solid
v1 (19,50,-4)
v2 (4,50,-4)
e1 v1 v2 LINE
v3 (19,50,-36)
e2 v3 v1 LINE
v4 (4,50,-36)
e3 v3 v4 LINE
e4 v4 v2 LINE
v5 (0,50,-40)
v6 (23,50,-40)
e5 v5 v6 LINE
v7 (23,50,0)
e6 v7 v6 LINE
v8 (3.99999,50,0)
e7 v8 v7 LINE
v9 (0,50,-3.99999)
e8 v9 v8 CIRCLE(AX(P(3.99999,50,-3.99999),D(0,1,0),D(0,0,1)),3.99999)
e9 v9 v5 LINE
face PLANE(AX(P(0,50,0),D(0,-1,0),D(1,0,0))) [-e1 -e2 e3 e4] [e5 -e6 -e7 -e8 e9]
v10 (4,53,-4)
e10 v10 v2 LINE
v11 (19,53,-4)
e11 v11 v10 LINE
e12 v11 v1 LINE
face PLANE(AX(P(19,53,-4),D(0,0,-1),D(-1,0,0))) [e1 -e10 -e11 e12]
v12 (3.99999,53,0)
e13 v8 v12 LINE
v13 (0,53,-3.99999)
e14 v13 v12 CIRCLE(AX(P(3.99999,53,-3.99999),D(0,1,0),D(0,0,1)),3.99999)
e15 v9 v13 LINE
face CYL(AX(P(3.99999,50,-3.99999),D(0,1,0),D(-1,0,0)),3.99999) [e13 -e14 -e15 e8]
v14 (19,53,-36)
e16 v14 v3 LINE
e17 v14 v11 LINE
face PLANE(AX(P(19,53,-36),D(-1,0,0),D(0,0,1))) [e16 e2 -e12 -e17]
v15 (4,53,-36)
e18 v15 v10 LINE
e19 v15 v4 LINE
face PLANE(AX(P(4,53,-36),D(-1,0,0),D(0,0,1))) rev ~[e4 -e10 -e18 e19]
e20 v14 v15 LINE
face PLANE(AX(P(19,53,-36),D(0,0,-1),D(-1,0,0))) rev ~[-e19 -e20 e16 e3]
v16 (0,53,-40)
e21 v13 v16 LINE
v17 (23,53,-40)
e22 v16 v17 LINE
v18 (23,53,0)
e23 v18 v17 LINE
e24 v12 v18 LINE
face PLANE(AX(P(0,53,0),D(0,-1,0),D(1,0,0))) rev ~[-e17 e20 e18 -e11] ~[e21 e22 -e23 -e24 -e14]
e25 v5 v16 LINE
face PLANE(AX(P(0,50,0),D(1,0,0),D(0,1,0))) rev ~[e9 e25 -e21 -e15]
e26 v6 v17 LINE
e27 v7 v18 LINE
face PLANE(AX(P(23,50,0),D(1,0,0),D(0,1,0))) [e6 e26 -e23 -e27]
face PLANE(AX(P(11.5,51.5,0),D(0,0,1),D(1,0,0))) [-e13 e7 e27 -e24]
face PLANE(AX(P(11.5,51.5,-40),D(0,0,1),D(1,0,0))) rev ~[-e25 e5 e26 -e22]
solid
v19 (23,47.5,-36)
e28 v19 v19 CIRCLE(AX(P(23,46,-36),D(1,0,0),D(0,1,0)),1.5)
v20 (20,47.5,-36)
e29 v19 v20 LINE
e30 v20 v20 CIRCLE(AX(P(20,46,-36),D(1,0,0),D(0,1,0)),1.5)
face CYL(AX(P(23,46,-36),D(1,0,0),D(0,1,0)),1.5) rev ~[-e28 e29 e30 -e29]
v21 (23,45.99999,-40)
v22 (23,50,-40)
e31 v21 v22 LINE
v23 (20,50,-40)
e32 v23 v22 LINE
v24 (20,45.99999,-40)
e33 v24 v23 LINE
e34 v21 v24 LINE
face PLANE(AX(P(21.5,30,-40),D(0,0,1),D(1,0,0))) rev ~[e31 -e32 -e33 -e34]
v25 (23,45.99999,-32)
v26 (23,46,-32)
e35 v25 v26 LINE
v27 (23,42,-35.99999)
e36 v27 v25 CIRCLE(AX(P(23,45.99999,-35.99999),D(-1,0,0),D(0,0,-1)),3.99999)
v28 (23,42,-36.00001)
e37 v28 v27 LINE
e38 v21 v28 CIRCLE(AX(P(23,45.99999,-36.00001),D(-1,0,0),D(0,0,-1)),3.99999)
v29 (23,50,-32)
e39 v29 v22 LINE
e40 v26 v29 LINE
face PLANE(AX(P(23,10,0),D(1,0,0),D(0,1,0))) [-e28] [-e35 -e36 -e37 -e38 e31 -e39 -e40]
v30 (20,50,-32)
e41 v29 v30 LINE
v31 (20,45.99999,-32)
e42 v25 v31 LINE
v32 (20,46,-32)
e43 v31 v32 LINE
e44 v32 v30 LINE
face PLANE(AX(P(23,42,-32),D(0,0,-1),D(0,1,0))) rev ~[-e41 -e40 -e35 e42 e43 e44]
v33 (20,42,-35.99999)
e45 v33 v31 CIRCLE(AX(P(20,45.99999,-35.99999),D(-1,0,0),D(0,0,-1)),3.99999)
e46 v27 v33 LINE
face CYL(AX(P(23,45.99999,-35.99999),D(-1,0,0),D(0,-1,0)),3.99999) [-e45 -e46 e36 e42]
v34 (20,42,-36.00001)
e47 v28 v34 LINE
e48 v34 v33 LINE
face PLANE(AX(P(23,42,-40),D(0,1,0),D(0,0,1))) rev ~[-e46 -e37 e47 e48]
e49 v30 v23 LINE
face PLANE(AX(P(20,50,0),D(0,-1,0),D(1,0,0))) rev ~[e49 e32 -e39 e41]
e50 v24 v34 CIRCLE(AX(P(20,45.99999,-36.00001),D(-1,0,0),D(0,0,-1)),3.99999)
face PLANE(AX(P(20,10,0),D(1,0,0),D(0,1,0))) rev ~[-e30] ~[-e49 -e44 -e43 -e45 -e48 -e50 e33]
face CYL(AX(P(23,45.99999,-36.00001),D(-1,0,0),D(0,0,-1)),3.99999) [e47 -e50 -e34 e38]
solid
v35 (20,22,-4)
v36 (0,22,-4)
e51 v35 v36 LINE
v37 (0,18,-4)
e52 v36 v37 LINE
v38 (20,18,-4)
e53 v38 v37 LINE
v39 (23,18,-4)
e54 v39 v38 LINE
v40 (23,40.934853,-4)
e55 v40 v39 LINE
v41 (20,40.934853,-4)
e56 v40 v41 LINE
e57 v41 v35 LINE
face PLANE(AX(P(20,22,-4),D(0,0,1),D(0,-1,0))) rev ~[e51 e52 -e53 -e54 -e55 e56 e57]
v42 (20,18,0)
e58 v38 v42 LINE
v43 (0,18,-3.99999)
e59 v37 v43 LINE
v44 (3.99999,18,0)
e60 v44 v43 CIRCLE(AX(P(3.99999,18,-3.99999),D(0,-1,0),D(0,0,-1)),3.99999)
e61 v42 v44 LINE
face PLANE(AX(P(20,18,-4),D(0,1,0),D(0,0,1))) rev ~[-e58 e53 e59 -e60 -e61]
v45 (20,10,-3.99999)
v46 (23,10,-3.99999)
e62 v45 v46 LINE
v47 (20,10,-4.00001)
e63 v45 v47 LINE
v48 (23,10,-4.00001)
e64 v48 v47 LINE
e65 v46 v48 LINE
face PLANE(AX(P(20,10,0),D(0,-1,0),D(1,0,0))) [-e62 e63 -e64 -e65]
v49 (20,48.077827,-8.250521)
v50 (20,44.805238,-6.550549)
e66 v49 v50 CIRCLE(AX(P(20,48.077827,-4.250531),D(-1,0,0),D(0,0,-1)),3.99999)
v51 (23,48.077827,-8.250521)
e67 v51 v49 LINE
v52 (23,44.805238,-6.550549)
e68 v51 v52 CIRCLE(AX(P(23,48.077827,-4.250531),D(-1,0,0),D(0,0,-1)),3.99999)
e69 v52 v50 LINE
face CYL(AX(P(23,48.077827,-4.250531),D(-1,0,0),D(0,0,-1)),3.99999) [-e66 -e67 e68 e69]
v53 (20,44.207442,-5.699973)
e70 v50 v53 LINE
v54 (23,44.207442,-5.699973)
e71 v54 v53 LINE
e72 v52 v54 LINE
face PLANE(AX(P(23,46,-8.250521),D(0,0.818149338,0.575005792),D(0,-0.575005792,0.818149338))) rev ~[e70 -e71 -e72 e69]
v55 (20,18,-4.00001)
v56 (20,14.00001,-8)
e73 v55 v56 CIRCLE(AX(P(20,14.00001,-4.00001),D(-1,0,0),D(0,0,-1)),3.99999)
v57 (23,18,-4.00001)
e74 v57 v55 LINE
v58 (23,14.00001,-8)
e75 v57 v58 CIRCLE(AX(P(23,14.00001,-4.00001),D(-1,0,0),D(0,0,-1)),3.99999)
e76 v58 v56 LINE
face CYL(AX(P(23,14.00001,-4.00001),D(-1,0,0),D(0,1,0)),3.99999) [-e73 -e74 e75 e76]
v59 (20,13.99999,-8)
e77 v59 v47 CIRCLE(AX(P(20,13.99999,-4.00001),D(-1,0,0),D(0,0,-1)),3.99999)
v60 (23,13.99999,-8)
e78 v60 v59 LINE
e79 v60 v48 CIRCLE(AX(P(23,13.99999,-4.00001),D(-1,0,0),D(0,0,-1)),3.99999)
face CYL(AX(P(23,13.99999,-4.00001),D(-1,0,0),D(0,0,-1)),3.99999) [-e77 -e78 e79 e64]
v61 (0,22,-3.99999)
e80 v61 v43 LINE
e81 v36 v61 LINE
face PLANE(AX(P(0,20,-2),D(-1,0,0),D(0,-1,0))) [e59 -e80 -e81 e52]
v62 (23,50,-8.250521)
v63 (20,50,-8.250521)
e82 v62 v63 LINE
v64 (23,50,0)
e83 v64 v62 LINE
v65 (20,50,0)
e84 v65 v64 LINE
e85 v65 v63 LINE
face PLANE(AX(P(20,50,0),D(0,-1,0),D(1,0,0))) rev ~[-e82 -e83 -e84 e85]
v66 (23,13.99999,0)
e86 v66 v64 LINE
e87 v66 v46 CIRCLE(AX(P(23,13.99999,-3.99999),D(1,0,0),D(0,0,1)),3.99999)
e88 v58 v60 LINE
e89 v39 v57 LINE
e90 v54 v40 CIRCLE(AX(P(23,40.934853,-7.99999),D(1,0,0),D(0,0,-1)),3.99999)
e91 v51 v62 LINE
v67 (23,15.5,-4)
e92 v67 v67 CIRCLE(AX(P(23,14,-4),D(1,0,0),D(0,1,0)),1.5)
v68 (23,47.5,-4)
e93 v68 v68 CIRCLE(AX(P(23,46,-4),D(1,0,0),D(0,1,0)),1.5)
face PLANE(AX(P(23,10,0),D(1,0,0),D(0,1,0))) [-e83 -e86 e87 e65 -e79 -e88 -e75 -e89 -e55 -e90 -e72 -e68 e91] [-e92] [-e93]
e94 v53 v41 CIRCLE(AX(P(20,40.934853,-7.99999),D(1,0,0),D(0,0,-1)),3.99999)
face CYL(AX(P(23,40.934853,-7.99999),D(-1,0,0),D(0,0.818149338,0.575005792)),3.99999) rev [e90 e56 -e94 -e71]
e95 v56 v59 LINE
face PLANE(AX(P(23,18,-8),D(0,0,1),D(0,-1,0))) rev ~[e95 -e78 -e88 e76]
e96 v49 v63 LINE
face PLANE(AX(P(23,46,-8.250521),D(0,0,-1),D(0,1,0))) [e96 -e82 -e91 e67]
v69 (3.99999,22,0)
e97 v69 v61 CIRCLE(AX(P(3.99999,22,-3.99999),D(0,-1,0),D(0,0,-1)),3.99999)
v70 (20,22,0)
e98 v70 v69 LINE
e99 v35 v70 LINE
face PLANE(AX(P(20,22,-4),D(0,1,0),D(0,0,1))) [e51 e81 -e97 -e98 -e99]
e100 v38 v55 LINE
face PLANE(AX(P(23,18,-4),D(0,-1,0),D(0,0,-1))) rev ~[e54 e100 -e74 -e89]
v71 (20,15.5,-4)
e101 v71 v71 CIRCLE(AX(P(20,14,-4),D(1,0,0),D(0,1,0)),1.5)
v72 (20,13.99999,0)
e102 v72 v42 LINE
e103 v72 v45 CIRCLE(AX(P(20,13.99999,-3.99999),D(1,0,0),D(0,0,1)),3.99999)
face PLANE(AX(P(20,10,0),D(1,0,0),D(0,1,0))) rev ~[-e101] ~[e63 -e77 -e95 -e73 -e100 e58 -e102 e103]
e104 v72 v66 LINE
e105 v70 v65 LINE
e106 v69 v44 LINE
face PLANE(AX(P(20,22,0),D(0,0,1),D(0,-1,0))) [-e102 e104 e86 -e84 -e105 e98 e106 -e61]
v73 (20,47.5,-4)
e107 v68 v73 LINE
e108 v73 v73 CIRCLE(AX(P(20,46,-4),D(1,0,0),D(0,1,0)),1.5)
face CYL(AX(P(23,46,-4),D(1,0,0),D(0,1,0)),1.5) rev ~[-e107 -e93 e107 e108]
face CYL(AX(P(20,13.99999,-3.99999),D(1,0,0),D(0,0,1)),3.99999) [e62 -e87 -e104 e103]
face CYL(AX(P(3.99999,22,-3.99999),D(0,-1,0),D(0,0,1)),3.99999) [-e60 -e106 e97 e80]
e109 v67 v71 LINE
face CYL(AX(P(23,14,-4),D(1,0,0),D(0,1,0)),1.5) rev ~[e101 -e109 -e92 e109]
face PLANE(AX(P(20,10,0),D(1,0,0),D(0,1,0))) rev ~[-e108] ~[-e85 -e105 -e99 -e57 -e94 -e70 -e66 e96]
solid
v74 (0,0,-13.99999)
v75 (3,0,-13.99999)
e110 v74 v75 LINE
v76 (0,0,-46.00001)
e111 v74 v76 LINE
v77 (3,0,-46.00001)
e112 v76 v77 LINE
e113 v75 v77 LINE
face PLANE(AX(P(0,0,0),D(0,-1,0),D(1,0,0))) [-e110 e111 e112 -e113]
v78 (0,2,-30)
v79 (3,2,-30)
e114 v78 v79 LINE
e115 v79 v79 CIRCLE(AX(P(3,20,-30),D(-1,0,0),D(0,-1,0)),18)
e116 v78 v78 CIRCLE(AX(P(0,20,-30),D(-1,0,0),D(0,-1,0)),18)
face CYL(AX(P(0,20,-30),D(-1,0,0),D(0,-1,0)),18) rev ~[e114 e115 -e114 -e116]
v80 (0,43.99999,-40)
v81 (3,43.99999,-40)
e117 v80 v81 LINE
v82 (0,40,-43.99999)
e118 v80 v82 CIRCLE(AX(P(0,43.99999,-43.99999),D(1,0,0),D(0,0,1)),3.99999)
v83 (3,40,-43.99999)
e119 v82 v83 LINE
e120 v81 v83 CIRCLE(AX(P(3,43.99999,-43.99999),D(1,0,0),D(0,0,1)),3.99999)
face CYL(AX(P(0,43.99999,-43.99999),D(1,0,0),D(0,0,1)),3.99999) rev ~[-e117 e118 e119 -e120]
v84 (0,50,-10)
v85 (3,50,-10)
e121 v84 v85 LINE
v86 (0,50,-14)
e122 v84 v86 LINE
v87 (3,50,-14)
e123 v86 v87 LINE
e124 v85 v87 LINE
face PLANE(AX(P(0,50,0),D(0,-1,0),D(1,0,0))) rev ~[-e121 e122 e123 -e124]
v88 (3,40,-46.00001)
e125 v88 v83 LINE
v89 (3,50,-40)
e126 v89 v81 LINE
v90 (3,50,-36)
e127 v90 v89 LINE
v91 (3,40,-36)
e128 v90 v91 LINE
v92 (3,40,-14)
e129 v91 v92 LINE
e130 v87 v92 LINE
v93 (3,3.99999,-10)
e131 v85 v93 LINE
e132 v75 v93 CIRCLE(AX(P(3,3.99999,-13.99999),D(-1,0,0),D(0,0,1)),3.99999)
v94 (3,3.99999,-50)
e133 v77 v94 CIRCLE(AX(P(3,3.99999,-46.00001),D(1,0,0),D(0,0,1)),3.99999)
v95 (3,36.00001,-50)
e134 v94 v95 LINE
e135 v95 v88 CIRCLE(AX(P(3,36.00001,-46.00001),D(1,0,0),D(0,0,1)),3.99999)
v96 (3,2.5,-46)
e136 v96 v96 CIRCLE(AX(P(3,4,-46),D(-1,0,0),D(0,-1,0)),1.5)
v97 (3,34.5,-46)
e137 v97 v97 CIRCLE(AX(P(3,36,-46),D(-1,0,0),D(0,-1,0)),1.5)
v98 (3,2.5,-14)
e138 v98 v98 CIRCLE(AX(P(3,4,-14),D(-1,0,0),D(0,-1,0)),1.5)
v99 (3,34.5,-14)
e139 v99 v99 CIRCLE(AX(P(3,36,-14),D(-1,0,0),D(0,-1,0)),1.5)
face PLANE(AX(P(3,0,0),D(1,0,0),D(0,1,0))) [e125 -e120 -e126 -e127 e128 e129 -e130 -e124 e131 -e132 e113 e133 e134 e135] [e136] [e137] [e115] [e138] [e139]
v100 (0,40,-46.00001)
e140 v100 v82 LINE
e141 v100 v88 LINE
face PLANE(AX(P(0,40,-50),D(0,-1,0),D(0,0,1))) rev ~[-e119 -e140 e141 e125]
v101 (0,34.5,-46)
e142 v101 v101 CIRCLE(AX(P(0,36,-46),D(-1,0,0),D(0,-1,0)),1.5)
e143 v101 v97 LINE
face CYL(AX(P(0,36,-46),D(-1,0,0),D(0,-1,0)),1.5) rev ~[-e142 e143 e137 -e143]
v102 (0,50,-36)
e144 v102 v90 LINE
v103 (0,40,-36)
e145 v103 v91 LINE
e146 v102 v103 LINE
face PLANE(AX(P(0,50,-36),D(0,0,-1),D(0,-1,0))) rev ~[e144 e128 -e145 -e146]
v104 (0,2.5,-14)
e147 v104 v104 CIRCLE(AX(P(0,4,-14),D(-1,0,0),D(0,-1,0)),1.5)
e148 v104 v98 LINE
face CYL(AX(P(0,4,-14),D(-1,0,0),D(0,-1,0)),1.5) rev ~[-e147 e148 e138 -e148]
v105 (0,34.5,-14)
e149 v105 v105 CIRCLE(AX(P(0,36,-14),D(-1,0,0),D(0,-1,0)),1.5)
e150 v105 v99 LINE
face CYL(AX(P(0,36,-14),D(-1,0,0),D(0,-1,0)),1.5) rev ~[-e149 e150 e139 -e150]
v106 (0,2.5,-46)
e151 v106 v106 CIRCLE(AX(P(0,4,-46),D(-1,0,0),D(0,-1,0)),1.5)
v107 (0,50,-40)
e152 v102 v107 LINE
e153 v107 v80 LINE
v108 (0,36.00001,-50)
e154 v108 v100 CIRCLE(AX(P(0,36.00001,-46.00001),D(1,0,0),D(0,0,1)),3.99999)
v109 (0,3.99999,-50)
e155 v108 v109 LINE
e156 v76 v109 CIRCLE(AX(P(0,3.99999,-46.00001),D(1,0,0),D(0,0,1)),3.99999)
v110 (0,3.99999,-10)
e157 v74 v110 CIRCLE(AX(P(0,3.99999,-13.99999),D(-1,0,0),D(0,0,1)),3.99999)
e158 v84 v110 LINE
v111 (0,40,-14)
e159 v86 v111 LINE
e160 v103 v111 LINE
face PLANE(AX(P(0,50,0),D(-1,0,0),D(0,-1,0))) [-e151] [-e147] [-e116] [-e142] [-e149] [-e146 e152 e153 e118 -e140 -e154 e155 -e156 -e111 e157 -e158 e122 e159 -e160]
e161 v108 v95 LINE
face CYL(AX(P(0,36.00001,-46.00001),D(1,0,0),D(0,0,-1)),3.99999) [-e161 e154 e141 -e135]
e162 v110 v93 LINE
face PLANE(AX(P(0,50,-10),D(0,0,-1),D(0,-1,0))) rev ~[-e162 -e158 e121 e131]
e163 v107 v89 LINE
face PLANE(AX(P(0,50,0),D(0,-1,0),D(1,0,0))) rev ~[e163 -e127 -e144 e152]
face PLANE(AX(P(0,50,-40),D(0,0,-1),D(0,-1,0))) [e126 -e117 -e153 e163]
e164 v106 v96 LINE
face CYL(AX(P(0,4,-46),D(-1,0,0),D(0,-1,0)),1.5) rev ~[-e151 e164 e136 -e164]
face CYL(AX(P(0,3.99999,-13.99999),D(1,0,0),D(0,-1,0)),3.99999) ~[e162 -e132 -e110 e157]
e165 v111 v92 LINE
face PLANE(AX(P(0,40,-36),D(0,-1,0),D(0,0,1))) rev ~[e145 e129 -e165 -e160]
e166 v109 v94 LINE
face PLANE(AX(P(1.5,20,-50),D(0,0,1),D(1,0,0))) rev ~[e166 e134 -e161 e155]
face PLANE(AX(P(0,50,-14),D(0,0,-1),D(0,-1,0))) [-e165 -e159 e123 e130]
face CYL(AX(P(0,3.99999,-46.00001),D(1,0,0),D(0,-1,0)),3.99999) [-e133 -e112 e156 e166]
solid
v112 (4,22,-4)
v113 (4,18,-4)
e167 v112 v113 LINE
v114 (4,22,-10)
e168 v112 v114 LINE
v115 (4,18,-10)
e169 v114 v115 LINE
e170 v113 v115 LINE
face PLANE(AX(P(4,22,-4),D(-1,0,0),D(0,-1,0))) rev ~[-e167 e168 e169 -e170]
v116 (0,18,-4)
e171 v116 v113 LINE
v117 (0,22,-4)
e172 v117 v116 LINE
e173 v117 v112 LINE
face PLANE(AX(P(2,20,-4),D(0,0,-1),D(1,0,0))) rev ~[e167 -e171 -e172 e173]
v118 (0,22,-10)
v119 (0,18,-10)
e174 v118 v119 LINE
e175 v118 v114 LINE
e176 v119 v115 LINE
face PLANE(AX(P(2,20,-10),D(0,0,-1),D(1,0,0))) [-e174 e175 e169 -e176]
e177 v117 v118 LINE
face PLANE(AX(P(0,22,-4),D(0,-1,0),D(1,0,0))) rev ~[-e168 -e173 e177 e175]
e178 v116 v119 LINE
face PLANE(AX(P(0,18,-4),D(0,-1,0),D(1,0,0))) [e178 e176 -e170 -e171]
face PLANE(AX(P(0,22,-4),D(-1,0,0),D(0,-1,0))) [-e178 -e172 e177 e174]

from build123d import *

# Parameters (mm, degrees)
F0_W      = 3
F0_H      = 40
F0_H_2    = 10
F3_DEPTH  = 50
F2_W      = 3
F2_H      = 40
F4_DEPTH  = 40
F1_W      = 23
F1_H      = 3
F5_DEPTH  = 40
F6_R      = 18
F7_DEPTH  = 3
F8_R      = 1.5
F9_DEPTH  = 3
F11_DEPTH = 3
F12_R     = 1.5
F13_DEPTH = 3
F14_W     = 15
F14_H     = 32
F15_DEPTH = 3
F16_W     = 10
F16_H     = 10
F17_DEPTH = 3
F18_W     = 10
F18_H     = 22
F18_W_2   = 50
F18_H_2   = 10
F19_DEPTH = 3
F20_W     = 4
F20_H     = 23.7494786941
F21_DEPTH = 3
F22_R     = 3.99999
F22_2_R   = 3.99999
F23_W     = 4
F23_H     = 4
F24_DEPTH = 20
F25_W     = 4
F25_H     = 4
F26_DEPTH = 6
F27_R     = 3.99999
F27_2_R   = 3.99999


# Not quite as in the source:
# - a fillet or chamfer is up to 0.001 mm smaller than in the source, because OpenCascade refuses the exact size


with BuildPart() as f3:
    # F0 (on Top) → F3 (new body)
    with BuildSketch(Plane.XY):
        with Locations((1.5, 20)):
            Rectangle(F0_W, F0_H)
        with Locations((1.5, 45)):
            Rectangle(F0_W, F0_H_2)
    extrude(amount=-F3_DEPTH)

    # F6 (on face) → F7 (cut)
    with BuildSketch(Plane(origin=(0, 0, 0), x_dir=(0, -1, 0), z_dir=(-1, 0, 0))):
        with Locations((-20, -30)):
            Circle(F6_R)
    extrude(amount=-F7_DEPTH, mode=Mode.SUBTRACT)

    # F8 (on face) → F9 (cut)
    with BuildSketch(Plane(origin=(0, 0, 0), x_dir=(0, -1, 0), z_dir=(-1, 0, 0))):
        with Locations((-4, -14)):
            Circle(F8_R)
        with Locations((-4, -46)):
            Circle(F8_R)
        with Locations((-36, -14)):
            Circle(F8_R)
        with Locations((-36, -46)):
            Circle(F8_R)
    extrude(amount=-F9_DEPTH, mode=Mode.SUBTRACT)

    # F16 (on face) → F17 (cut)
    with BuildSketch(Plane(origin=(0, 0, 0), x_dir=(0, -1, 0), z_dir=(-1, 0, 0))):
        with Locations((-45, -45)):
            Rectangle(F16_W, F16_H)
    extrude(amount=-F17_DEPTH, mode=Mode.SUBTRACT)

    # F18 (on face) → F19 (cut)
    with BuildSketch(Plane(origin=(0, 0, 0), x_dir=(0, -1, 0), z_dir=(-1, 0, 0))):
        with Locations((-45, -25)):
            Rectangle(F18_W, F18_H)
        with Locations((-25, -5)):
            Rectangle(F18_W_2, F18_H_2)
    extrude(amount=-F19_DEPTH, mode=Mode.SUBTRACT)

    # F22#2 (radius 4 in the source; OpenCascade refuses exactly that, so slightly less here)
    f22_2_edges = [f3.edges().sort_by_distance(p)[0] for p in [
        (1.5, 0, -10),
        (1.5, 0, -50),
        (1.5, 40, -50),
        (1.5, 40, -40),
    ]]
    fillet(f22_2_edges, radius=F22_2_R)


with BuildPart() as f4:
    # F2 (on Top) → F4 (new body)
    with BuildSketch(Plane.XY):
        with Locations((21.5, 30)):
            Rectangle(F2_W, F2_H)
    extrude(amount=-F4_DEPTH)

    # F10 (on face) → F11 (cut)
    with BuildSketch(Plane.YZ.offset(23)):
        Polygon((18, -8), (10, -8), (10, -40), (42, -40), (42, -32), (46, -32), (46, -8.2505213059), (43.0126793981, -4), (18, -4), align=None)
    extrude(amount=-F11_DEPTH, mode=Mode.SUBTRACT)

    # F12 (on face) → F13 (cut)
    with BuildSketch(Plane.YZ.offset(23)):
        with Locations((14, -4)):
            Circle(F12_R)
        with Locations((46, -4)):
            Circle(F12_R)
        with Locations((46, -36)):
            Circle(F12_R)
    extrude(amount=-F13_DEPTH, mode=Mode.SUBTRACT)

    # F20 (on face) → F21 (cut)
    with BuildSketch(Plane.YZ.offset(23)):
        with Locations((48, -20.125260653)):
            Rectangle(F20_W, F20_H)
    extrude(amount=-F21_DEPTH, mode=Mode.SUBTRACT)

    # F22 (radius 4 in the source; OpenCascade refuses exactly that, so slightly less here)
    f22_edges = [f4.edges().sort_by_distance(p)[0] for p in [
        (21.5, 10, 0),
        (21.5, 10, -8),
        (21.5, 18, -8),
        (21.5, 43.012679, -4),
        (21.5, 42, -40),
        (21.5, 42, -32),
        (21.5, 46, -8.250521),
    ]]
    fillet(f22_edges, radius=F22_R)

    # F23 (on face) → F24 (join)
    with BuildSketch(Plane(origin=(20, 0, 0), x_dir=(0, -1, 0), z_dir=(-1, 0, 0))):
        with Locations((-20, -2)):
            Rectangle(F23_W, F23_H)
    extrude(amount=F24_DEPTH)

    # F27#2 (radius 4 in the source; OpenCascade refuses exactly that, so slightly less here)
    f27_2_edges = [f4.edges().sort_by_distance(p)[0] for p in [
        (0, 20, 0),
    ]]
    fillet(f27_2_edges, radius=F27_2_R)


with BuildPart() as f5:
    # F1 (on Top) → F5 (new body)
    with BuildSketch(Plane.XY):
        with Locations((11.5, 51.5)):
            Rectangle(F1_W, F1_H)
    extrude(amount=-F5_DEPTH)

    # F14 (on face) → F15 (cut)
    with BuildSketch(Plane(origin=(0, 53, 0), x_dir=(-1, 0, 0), z_dir=(0, 1, 0))):
        with Locations((-11.5, -20)):
            Rectangle(F14_W, F14_H)
    extrude(amount=-F15_DEPTH, mode=Mode.SUBTRACT)

    # F27 (radius 4 in the source; OpenCascade refuses exactly that, so slightly less here)
    f27_edges = [f5.edges().sort_by_distance(p)[0] for p in [
        (0, 51.5, 0),
    ]]
    fillet(f27_edges, radius=F27_R)


with BuildPart() as f26:
    # F25 (on face) → F26 (new body, through all)
    with BuildSketch(Plane(origin=(0, 0, -4), x_dir=(1, 0, 0), z_dir=(0, 0, -1))):
        with Locations((2, -20)):
            Rectangle(F25_W, F25_H)
    extrude(amount=F26_DEPTH)


solid = Compound([f3.part, f4.part, f5.part, f26.part])
